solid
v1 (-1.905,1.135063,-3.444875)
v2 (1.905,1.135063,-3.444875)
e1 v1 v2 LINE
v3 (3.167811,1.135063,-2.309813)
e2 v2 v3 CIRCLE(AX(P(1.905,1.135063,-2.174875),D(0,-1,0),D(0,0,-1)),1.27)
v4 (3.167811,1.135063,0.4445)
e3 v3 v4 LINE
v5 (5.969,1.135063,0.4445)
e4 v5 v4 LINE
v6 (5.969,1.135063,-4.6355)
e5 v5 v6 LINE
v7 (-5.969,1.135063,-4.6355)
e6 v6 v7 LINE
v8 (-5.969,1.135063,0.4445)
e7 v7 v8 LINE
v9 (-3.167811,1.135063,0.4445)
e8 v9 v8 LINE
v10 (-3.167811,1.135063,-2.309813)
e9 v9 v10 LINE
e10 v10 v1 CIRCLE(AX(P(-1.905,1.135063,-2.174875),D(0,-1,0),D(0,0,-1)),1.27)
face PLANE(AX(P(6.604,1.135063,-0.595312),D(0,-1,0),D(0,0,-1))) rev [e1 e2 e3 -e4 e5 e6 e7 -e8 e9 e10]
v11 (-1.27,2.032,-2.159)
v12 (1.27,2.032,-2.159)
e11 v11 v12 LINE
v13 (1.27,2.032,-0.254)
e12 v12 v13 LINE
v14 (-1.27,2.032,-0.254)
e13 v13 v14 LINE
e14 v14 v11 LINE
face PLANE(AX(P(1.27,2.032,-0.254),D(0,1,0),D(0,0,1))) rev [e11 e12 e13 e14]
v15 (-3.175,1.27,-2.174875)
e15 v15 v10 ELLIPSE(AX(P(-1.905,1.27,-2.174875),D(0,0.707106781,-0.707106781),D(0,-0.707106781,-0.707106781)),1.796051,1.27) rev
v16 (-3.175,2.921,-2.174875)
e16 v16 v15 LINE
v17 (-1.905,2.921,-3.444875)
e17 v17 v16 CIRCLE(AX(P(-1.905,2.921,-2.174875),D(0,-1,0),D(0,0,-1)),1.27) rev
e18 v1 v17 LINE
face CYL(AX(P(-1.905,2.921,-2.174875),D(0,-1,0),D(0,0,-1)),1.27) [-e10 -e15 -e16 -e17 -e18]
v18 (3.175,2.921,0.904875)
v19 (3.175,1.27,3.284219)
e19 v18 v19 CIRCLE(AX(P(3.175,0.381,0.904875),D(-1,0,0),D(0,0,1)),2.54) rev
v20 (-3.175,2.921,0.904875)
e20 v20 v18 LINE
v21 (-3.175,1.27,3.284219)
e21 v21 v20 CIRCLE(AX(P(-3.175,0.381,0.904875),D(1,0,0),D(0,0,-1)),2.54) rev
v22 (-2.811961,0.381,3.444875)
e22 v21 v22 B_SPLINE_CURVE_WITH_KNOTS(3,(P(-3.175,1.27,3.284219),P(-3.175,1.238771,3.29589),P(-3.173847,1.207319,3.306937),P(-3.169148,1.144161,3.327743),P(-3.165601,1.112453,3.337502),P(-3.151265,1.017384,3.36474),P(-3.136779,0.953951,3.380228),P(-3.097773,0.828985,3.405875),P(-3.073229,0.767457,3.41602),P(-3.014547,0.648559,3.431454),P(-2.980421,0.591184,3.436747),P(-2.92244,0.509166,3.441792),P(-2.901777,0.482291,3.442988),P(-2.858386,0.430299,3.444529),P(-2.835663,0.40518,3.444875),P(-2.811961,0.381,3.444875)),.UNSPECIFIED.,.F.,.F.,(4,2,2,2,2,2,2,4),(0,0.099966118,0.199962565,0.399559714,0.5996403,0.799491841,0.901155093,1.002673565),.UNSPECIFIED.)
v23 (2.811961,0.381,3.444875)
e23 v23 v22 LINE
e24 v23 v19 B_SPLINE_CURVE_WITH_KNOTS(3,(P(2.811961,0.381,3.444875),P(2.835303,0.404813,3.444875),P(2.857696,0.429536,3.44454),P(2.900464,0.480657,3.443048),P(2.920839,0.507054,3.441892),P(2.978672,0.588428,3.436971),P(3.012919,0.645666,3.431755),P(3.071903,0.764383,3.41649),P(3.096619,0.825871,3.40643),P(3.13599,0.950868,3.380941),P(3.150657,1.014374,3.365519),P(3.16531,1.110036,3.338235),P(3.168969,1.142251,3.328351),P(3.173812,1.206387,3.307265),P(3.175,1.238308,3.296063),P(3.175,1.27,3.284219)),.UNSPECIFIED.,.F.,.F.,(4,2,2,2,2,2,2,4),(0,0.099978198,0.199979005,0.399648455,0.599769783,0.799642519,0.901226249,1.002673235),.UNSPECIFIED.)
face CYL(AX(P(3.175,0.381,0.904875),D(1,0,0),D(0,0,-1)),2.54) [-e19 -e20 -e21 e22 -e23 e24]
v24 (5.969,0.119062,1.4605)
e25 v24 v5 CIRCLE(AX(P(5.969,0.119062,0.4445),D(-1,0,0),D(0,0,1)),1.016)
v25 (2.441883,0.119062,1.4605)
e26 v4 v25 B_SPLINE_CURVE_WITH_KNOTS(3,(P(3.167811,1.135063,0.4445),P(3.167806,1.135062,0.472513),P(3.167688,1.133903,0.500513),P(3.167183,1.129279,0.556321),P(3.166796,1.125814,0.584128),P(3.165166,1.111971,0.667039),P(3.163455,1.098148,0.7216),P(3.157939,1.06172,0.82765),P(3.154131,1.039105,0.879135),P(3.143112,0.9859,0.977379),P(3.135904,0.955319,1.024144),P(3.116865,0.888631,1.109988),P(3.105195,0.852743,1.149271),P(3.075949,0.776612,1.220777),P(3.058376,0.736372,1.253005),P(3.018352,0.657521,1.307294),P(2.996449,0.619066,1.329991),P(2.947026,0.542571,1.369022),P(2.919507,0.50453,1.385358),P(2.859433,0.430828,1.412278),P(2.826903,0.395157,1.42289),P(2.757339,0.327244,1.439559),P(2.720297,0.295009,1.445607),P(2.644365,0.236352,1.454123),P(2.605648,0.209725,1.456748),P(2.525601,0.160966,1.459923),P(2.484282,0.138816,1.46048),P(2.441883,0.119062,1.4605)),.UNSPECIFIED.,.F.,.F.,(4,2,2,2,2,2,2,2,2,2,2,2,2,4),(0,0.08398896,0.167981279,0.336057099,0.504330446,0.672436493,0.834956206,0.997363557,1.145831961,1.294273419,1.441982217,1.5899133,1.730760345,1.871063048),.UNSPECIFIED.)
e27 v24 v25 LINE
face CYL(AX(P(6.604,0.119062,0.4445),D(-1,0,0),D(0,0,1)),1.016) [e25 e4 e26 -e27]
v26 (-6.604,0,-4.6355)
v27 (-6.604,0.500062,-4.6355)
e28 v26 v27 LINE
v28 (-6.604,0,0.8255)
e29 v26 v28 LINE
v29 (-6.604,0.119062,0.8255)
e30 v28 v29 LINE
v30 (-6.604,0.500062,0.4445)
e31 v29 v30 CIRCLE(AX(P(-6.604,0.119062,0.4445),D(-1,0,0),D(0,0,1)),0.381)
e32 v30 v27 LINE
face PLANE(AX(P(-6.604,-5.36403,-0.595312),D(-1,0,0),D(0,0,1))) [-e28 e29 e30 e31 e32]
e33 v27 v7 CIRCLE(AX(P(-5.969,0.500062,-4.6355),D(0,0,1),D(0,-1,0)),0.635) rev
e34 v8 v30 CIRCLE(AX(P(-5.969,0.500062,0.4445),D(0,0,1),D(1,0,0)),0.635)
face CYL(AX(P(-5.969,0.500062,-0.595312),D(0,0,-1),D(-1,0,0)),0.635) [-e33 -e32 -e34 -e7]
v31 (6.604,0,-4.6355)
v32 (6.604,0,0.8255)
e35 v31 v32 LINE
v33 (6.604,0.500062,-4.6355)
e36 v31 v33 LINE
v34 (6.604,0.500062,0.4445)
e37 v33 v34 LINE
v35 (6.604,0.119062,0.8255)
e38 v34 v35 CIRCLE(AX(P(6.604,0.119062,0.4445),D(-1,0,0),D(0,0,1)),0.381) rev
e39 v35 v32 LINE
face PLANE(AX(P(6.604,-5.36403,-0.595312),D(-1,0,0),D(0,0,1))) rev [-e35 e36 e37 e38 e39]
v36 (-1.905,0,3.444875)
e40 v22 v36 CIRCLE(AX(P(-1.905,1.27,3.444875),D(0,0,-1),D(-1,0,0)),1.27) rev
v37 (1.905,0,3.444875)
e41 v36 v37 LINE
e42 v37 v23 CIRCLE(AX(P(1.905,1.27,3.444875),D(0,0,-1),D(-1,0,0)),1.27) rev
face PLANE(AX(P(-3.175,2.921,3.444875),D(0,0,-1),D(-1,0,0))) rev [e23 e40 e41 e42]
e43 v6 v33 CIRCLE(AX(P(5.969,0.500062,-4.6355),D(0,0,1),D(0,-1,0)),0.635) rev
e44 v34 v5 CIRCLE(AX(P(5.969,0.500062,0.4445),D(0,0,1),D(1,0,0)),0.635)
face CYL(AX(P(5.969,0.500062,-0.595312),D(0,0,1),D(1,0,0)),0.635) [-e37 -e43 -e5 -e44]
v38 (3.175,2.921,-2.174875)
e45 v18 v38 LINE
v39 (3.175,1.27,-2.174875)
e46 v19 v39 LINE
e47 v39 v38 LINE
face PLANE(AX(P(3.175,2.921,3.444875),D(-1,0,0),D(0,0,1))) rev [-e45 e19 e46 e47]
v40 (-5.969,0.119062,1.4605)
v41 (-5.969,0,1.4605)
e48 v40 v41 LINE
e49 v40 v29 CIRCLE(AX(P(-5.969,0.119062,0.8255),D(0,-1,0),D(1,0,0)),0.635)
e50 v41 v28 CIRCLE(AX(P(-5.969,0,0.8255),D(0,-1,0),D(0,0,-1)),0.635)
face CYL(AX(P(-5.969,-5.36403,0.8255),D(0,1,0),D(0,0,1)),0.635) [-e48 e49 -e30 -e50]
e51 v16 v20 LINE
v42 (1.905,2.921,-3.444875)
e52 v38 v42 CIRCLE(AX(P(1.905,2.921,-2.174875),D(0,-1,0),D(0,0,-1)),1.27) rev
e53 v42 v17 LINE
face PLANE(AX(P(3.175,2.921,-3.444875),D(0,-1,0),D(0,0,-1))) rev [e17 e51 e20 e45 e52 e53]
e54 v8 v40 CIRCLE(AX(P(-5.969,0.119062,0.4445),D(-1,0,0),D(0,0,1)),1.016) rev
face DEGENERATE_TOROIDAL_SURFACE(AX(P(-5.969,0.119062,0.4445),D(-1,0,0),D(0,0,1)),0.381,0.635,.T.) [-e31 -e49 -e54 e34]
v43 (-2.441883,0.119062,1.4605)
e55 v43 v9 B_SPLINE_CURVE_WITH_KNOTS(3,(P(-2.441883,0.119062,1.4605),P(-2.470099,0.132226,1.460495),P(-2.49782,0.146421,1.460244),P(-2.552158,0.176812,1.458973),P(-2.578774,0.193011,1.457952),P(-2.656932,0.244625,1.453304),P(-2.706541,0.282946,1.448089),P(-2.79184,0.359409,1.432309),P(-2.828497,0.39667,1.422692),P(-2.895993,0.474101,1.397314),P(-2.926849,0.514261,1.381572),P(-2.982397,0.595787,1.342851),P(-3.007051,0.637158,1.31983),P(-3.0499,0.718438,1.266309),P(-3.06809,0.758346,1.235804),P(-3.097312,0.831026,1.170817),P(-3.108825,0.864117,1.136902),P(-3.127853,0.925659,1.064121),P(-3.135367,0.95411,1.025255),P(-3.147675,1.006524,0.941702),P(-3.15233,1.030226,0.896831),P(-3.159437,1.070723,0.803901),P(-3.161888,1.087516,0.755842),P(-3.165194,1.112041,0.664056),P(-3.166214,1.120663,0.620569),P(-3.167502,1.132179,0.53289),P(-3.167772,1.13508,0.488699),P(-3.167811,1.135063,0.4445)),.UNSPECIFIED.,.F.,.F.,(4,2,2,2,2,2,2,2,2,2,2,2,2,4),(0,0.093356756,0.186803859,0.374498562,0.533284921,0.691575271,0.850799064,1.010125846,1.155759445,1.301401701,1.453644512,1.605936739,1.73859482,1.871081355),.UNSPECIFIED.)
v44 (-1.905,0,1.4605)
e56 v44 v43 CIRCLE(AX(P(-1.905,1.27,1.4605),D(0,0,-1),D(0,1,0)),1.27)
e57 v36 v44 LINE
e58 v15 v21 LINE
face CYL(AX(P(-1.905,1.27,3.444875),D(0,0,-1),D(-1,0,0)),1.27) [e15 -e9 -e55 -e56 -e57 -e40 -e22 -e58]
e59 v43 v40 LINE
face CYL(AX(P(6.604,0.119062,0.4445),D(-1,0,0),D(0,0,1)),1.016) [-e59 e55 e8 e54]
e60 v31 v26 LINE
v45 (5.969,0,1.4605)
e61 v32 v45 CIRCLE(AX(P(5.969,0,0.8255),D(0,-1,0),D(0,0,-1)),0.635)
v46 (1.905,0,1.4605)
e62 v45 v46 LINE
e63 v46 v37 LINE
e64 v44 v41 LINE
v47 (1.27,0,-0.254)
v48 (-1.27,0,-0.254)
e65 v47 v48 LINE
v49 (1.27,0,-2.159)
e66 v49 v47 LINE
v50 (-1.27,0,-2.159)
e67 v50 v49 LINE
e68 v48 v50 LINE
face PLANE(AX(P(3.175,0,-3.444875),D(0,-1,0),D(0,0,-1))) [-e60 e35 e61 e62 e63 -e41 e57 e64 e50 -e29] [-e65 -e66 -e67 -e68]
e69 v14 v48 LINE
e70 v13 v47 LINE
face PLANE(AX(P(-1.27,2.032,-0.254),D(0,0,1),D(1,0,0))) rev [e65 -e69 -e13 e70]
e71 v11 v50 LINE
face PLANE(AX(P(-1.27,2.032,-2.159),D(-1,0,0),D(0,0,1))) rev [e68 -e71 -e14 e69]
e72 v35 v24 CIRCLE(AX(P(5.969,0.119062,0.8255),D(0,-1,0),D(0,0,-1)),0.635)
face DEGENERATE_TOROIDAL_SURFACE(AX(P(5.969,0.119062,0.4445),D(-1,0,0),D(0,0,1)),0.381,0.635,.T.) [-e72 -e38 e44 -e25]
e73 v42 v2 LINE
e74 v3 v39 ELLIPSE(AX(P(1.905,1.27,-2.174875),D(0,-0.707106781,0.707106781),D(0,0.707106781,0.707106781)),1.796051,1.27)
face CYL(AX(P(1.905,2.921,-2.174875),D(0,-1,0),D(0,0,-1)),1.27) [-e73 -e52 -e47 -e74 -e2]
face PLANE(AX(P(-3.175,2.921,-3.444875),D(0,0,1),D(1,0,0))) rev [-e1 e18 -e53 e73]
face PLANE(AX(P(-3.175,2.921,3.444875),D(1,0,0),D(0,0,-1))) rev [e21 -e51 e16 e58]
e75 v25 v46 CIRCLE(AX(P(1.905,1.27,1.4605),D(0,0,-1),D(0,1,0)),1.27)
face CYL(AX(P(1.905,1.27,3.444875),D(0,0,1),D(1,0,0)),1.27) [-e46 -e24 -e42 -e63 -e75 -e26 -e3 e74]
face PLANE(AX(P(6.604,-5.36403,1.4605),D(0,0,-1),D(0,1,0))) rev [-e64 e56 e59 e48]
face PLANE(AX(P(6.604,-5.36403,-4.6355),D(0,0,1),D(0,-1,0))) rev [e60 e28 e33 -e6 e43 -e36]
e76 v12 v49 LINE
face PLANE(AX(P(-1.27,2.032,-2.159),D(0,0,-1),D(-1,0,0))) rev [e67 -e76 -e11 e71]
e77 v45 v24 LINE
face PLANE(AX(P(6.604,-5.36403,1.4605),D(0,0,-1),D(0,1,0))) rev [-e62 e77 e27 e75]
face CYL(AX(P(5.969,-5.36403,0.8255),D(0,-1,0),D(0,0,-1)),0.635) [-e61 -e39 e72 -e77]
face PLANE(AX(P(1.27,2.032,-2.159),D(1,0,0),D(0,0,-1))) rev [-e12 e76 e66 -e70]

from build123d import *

# Parameters (mm, degrees)
SKETCH3_W                = 6.35
SKETCH3_H                = 6.88975
BOSS_EXTRUDE3_DEPTH      = 2.921
FILLET1_R                = 2.54
BOSS_EXTRUDE5_DEPTH      = 3.429
BOSS_EXTRUDE5_DEPTH_BACK = 9.779
SKETCH5_W                = 1.190625
SKETCH5_H                = 1.1350625
FILLET7_START            = 1.4605
FILLET7_DEPTH            = 1.984375
FILLET7_START_2          = -4.6355
FILLET7_2_DEPTH          = 6.096
FILLET7_START_3          = -3.175
FILLET7_3_DEPTH          = 0.733117551
FILLET7_START_4          = 2.441882449
FILLET7_4_DEPTH          = 0.733117551
FILLET7_START_5          = -3.4448751
FILLET7_5_DEPTH          = 4.9053751
FILLET8_R                = 1.27
FILLET10_R               = 0.635
SKETCH6_W                = 2.54
SKETCH6_H                = 1.905
CUT_EXTRUDE1_DEPTH       = 2.032


with BuildPart() as part:
    # Sketch3 → Boss-Extrude3 (new body)
    with BuildSketch(Plane(origin=(0, 0, 0), x_dir=(1, 0, 0), z_dir=(0, 1, 0))):
        Rectangle(SKETCH3_W, SKETCH3_H)
    extrude(amount=BOSS_EXTRUDE3_DEPTH)

    # Fillet1
    fillet1_edges = [part.edges().sort_by_distance(p)[0] for p in [
        (0, 2.921, 3.444875),
    ]]
    fillet(fillet1_edges, radius=FILLET1_R)

    # Sketch5 → Boss-Extrude5 (add, two sides: drawn at the far end of the back side and taken through both)
    with BuildSketch(Plane.ZY.offset(3.175).offset(-BOSS_EXTRUDE5_DEPTH_BACK)):
        with BuildLine():
            Line((-3.444875, 0), (1.4605, 0))
            Line((1.4605, 0), (1.4605, 0.1190625))
            ThreePointArc((1.4605, 0.1190625), (1.16292049, 0.83748299), (0.4445, 1.1350625))
            Line((0.4445, 1.1350625), (-3.444875, 1.1350625))
            Line((-3.444875, 1.1350625), (-3.444875, 0))
        make_face()
        with Locations((-4.0401875, 0.56753125)):
            Rectangle(SKETCH5_W, SKETCH5_H)
    extrude(amount=BOSS_EXTRUDE5_DEPTH + BOSS_EXTRUDE5_DEPTH_BACK)

    # Fillet7: read off the stored shape, not the designer's step
    # Fillet7 outline → Fillet7 (cut)
    with BuildSketch(Plane.XY.offset(FILLET7_START)):
        with BuildLine():
            Line((1.905, 0), (3.175, 0))
            Line((3.175, 0), (3.175, 1.27))
            ThreePointArc((3.175, 1.27), (2.803025612, 0.371974388), (1.905, 0))
        make_face()
        with BuildLine():
            Line((-3.175, 0), (-1.905, 0))
            ThreePointArc((-1.905, 0), (-2.803025612, 0.371974388), (-3.175, 1.27))
            Line((-3.175, 1.27), (-3.175, 0))
        make_face()
    extrude(amount=FILLET7_DEPTH, mode=Mode.SUBTRACT)

    # Fillet7 2 outline → Fillet7 2 (cut)
    with BuildSketch(Plane.XY.offset(FILLET7_START_2)):
        with BuildLine():
            ThreePointArc((3.175, 1.27), (3.173201501, 1.202435569), (3.167811099, 1.1350625))
            Line((3.167811099, 1.1350625), (3.175, 1.1350625))
            Line((3.175, 1.1350625), (3.175, 1.27))
        make_face()
        with BuildLine():
            Line((-3.175, 1.1350625), (-3.167811099, 1.1350625))
            ThreePointArc((-3.167811099, 1.1350625), (-3.173201501, 1.202435569), (-3.175, 1.27))
            Line((-3.175, 1.27), (-3.175, 1.1350625))
        make_face()
    extrude(amount=FILLET7_2_DEPTH, mode=Mode.SUBTRACT)

    # Fillet7 3 outline → Fillet7 3 (cut)
    with BuildSketch(Plane.YZ.offset(FILLET7_START_3)):
        with BuildLine():
            Line((1.1350625, 1.4605), (0.1190625, 1.4605))
            ThreePointArc((0.1190625, 1.4605), (0.83748299, 1.16292049), (1.1350625, 0.4445))
            Line((1.1350625, 0.4445), (1.1350625, 1.4605))
        make_face()
    extrude(amount=FILLET7_3_DEPTH, mode=Mode.SUBTRACT)

    # Fillet7 4 outline → Fillet7 4 (cut)
    with BuildSketch(Plane.YZ.offset(FILLET7_START_4)):
        with BuildLine():
            Line((1.1350625, 1.4605), (0.1190625, 1.4605))
            ThreePointArc((0.1190625, 1.4605), (0.83748299, 1.16292049), (1.1350625, 0.4445))
            Line((1.1350625, 0.4445), (1.1350625, 1.4605))
        make_face()
    extrude(amount=FILLET7_4_DEPTH, mode=Mode.SUBTRACT)

    # Fillet7 5 outline → Fillet7 5 (add)
    with BuildSketch(Plane.XY.offset(FILLET7_START_5)):
        with BuildLine():
            Line((2.441882449, 1.1350625), (2.441882467, 0.119062462))
            ThreePointArc((2.441882467, 0.119062462), (2.938338401, 0.531683166), (3.167811099, 1.1350625))
            Line((3.167811099, 1.1350625), (2.441882449, 1.1350625))
        make_face()
        with BuildLine():
            ThreePointArc((-3.167811099, 1.1350625), (-2.938338401, 0.531683166), (-2.441882467, 0.119062462))
            Line((-2.441882467, 0.119062462), (-2.441882449, 1.1350625))
            Line((-2.441882449, 1.1350625), (-3.167811099, 1.1350625))
        make_face()
    extrude(amount=FILLET7_5_DEPTH)

    # Fillet8
    # the kernel refuses this fillet: 1.27 mm, written as the material it takes off along each edge
    with BuildSketch(Plane(origin=(-3.175, -1.905, -3.444875), x_dir=(0, 0, 1), z_dir=(0, 1, 0))) as fillet8_piece_1_section:
        with BuildLine():
            CenterArc((FILLET8_R, FILLET8_R), FILLET8_R, 180, 90)
            Line((0, FILLET8_R), (0, 0))
            Line((0, 0), (FILLET8_R, 0))
        make_face()
    fillet8_piece_1 = extrude(amount=8.001, mode=Mode.PRIVATE)
    fillet8_piece_1 = split(fillet8_piece_1, bisect_by=Plane(origin=(-3.175, 1.1350625, -3.444875), z_dir=(0, 1, 0)), keep=Keep.TOP, mode=Mode.PRIVATE)
    add(fillet8_piece_1, mode=Mode.SUBTRACT)
    with BuildSketch(Plane(origin=(3.175, -1.905, -3.444875), x_dir=(-1, 0, 0), z_dir=(0, 1, 0))) as fillet8_piece_2_section:
        with BuildLine():
            CenterArc((FILLET8_R, FILLET8_R), FILLET8_R, 180, 90)
            Line((0, FILLET8_R), (0, 0))
            Line((0, 0), (FILLET8_R, 0))
        make_face()
    fillet8_piece_2 = extrude(amount=8.001, mode=Mode.PRIVATE)
    fillet8_piece_2 = split(fillet8_piece_2, bisect_by=Plane(origin=(3.175, 1.1350625, -3.444875), z_dir=(0, 1, 0)), keep=Keep.TOP, mode=Mode.PRIVATE)
    add(fillet8_piece_2, mode=Mode.SUBTRACT)

    # Fillet10
    fillet10_edges = [part.edges().sort_by_distance(p)[0] for p in [
        (-6.604, 0.83748299, 1.16292049),
        (-6.604, 1.1350625, -2.0955),
        (-6.604, 0.05953125, 1.4605),
        (6.604, 0.83748299, 1.16292049),
        (6.604, 0.05953125, 1.4605),
        (6.604, 1.1350625, -2.0955),
    ]]
    fillet(fillet10_edges, radius=FILLET10_R)

    # Sketch6 → Cut-Extrude1 (cut)
    with BuildSketch(Plane.XZ):
        with Locations((0, -1.2065)):
            Rectangle(SKETCH6_W, SKETCH6_H)
    extrude(amount=-CUT_EXTRUDE1_DEPTH, mode=Mode.SUBTRACT)


solid = part.part
